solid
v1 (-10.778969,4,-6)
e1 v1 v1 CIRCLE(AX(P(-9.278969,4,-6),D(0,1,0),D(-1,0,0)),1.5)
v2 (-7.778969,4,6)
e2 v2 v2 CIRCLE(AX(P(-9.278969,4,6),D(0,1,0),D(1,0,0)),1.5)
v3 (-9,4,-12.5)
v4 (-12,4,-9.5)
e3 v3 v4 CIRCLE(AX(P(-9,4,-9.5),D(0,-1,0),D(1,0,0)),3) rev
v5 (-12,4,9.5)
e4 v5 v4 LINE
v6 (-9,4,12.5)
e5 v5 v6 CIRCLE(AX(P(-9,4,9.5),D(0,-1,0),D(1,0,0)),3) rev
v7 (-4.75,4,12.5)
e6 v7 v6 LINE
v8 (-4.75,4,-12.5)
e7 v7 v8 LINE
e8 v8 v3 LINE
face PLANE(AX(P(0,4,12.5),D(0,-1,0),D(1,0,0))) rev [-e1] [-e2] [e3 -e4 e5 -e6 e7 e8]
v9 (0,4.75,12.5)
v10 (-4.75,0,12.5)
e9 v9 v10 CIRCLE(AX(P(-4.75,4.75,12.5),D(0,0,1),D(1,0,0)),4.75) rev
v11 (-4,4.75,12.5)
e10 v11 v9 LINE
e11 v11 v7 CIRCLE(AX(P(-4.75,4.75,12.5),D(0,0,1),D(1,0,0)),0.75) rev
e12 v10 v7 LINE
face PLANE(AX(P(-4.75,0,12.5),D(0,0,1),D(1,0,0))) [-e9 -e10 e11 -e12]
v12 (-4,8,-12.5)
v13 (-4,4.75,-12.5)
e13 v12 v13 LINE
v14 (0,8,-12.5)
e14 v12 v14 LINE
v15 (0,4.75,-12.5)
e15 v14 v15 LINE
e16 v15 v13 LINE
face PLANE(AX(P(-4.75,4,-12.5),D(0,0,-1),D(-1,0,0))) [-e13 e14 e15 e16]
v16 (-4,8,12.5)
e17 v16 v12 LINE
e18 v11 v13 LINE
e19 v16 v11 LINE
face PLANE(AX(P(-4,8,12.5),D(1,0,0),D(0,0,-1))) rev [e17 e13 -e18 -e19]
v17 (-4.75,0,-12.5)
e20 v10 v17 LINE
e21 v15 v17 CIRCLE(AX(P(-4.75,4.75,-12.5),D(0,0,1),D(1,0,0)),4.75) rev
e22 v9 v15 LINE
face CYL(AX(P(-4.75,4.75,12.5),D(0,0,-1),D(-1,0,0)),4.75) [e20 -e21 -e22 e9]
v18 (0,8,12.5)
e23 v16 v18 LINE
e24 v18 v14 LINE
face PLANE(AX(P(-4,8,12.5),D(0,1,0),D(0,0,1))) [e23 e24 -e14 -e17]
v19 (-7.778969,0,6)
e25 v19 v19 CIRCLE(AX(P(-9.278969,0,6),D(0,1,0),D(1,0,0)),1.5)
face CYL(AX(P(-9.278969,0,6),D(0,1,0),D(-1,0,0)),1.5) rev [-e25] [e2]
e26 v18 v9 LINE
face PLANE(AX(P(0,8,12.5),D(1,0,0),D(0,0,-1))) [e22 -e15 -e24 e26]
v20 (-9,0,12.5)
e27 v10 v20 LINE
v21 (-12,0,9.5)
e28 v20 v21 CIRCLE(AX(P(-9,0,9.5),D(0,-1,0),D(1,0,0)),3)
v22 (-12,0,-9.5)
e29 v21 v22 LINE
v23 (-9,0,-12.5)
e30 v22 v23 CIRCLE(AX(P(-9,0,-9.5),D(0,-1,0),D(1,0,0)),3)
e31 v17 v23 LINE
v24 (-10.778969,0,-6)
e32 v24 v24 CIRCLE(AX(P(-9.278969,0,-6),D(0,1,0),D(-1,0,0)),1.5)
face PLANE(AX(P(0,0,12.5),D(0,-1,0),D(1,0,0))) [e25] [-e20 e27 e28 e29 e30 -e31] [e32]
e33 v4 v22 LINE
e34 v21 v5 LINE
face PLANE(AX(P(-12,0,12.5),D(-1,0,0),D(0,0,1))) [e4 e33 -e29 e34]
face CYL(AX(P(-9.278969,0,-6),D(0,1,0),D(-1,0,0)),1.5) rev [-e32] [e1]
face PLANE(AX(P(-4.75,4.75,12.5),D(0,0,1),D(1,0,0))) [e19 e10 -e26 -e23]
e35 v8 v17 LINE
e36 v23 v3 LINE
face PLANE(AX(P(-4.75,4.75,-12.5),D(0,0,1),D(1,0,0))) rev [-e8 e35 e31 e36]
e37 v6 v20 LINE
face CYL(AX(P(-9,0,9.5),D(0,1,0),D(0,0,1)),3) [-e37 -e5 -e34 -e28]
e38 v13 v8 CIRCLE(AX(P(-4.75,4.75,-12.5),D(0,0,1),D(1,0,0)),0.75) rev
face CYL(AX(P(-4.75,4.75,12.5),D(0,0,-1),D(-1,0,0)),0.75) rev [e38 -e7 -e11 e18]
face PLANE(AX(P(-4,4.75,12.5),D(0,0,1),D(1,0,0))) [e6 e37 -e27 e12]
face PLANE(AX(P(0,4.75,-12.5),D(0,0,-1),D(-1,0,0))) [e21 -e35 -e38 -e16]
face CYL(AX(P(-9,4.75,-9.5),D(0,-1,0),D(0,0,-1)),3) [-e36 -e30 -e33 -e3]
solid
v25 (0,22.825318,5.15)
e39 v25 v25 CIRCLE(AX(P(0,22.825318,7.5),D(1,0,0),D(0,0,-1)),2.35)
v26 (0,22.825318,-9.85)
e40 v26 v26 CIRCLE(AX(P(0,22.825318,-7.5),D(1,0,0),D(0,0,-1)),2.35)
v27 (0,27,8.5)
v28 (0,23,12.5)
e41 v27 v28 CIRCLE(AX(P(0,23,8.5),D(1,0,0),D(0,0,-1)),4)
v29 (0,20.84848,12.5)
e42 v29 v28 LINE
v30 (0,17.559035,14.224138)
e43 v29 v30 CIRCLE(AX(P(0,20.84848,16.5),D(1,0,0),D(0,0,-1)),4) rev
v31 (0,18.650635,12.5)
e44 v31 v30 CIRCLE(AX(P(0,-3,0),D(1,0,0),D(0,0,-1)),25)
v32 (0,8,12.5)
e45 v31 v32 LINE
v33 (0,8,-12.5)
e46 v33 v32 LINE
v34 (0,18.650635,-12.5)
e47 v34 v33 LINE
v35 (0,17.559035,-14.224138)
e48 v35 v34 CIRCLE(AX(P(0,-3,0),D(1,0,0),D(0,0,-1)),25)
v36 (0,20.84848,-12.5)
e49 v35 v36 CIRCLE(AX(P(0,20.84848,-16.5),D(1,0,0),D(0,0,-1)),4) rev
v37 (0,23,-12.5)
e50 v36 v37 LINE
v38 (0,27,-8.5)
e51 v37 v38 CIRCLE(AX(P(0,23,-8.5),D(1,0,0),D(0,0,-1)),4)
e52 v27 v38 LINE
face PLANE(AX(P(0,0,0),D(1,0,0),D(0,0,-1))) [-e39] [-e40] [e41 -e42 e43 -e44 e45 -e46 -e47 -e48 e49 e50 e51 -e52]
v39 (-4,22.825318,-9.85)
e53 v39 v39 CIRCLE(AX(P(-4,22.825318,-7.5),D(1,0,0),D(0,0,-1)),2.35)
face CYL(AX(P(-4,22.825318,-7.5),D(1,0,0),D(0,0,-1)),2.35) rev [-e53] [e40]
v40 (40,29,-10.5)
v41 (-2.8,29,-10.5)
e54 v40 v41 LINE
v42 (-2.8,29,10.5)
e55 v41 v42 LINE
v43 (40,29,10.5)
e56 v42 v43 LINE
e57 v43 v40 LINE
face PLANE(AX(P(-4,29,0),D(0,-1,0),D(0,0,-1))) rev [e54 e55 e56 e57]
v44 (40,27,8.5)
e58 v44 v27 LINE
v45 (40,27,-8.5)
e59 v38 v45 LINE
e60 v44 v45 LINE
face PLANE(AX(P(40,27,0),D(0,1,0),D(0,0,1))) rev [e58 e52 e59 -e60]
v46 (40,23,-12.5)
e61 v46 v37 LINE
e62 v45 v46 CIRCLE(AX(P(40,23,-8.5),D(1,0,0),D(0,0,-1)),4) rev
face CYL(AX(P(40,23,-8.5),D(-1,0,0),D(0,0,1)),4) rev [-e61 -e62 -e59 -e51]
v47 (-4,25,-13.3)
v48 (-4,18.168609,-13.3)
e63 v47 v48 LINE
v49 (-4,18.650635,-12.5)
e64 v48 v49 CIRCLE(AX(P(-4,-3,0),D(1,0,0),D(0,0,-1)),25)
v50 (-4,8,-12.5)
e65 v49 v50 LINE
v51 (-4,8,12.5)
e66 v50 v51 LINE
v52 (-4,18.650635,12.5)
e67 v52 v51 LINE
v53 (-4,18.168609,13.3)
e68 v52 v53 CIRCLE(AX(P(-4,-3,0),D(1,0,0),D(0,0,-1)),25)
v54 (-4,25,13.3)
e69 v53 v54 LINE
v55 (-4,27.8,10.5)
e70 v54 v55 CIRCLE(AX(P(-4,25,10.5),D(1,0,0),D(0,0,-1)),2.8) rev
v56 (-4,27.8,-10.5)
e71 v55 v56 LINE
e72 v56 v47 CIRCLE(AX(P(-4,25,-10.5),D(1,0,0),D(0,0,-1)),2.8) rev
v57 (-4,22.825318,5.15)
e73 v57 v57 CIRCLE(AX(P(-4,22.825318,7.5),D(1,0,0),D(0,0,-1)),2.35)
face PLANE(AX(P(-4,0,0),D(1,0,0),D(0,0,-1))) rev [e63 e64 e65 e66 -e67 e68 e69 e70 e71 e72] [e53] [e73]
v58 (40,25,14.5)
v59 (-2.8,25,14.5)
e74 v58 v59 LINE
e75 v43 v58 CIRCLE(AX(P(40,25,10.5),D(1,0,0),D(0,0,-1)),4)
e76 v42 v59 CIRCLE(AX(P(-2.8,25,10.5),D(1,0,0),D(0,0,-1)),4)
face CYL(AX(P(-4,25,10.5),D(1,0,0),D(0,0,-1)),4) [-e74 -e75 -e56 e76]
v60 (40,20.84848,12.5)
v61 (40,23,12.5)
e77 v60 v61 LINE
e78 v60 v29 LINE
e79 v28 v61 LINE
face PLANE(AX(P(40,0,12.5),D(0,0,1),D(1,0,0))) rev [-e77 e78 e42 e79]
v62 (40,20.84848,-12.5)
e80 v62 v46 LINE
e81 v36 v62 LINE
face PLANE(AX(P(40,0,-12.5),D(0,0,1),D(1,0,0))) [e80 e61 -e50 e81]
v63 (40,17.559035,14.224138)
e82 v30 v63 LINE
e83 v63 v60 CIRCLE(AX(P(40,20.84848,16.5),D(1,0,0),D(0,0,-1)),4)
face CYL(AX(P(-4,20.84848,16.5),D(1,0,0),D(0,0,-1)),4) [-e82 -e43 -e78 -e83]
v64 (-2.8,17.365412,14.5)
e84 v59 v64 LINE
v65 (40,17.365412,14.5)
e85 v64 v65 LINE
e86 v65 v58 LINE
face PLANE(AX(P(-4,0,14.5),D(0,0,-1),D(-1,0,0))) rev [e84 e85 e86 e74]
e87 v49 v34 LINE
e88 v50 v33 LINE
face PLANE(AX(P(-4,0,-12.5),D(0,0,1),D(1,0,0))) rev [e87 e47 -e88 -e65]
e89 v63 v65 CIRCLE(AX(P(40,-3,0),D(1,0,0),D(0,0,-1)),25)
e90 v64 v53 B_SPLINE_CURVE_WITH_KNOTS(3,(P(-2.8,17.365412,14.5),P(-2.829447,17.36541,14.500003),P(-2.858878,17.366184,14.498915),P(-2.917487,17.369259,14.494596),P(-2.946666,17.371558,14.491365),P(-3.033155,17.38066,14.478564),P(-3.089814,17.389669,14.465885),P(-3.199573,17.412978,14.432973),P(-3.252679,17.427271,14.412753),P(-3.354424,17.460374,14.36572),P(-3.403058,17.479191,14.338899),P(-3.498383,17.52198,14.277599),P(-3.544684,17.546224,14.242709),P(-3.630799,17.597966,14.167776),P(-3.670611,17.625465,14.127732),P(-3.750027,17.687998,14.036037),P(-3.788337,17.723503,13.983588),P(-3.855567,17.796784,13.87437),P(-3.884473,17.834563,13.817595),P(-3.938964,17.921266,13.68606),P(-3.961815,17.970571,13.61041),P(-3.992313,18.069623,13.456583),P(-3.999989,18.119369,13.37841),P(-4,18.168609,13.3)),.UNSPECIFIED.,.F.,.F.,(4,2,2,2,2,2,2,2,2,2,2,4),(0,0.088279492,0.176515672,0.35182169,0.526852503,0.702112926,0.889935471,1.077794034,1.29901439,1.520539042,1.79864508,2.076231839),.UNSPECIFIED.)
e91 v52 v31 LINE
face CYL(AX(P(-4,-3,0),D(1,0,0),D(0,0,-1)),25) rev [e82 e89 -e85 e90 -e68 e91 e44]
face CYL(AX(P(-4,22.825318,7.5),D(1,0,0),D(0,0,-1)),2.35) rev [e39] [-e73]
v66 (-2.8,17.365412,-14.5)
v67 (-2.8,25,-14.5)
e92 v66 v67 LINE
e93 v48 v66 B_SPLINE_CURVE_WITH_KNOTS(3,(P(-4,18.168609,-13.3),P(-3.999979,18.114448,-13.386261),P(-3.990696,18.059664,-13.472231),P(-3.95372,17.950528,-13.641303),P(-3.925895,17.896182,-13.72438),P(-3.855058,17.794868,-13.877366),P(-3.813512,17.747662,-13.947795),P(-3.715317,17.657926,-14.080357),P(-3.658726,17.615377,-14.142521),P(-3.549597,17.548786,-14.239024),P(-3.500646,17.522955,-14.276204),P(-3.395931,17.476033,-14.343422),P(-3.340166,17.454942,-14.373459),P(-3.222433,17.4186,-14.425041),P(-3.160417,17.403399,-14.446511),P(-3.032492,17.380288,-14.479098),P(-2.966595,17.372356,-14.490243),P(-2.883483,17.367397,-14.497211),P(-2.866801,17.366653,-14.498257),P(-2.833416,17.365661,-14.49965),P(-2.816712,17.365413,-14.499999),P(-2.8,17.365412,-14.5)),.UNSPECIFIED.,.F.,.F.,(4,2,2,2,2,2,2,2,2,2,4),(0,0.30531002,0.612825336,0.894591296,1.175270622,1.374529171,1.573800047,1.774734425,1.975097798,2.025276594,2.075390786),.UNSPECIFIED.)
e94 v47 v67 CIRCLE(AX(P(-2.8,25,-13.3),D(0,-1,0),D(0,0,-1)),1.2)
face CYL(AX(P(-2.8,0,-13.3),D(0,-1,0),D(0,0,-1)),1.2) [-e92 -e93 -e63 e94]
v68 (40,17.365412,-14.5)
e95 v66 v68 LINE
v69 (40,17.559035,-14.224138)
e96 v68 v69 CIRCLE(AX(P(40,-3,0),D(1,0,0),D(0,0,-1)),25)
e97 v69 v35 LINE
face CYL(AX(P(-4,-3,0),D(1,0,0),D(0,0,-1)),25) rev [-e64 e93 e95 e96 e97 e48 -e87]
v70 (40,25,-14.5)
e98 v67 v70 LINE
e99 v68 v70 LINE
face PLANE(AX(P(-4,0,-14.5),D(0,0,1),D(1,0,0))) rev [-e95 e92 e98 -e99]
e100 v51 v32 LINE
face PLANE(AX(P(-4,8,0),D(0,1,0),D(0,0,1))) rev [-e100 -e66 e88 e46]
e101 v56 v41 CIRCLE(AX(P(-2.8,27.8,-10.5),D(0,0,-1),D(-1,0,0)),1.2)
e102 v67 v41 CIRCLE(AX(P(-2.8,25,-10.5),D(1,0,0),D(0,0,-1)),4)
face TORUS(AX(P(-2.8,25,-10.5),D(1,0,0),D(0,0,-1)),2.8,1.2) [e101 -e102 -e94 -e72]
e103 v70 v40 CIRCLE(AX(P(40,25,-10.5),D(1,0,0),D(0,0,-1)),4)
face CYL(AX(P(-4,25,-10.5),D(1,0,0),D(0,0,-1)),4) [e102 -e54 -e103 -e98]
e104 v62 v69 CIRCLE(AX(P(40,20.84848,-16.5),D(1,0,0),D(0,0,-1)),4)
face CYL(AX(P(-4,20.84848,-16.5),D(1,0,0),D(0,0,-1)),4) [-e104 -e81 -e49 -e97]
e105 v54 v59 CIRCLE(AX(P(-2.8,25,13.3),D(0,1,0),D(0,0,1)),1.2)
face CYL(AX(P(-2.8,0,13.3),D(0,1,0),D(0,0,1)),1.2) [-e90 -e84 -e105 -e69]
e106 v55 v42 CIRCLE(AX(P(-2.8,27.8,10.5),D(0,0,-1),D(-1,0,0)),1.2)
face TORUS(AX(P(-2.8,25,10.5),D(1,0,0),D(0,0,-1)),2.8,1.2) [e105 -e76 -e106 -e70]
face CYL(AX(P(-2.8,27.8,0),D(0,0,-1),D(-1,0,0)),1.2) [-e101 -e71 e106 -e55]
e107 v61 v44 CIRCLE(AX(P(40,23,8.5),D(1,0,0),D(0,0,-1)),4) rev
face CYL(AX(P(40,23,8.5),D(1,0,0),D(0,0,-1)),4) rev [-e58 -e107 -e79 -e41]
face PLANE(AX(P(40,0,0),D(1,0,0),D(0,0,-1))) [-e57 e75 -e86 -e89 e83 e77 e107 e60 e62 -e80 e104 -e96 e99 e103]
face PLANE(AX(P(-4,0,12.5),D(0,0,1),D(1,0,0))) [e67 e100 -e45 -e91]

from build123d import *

# Parameters (mm, degrees)
BASE_FLANGE1_DEPTH  = 12.5
FILLET1_R           = 3
SKETCH6_R           = 1.5
CUT_EXTRUDE1_DEPTH  = 18.783419244
BOSS_EXTRUDE1_DEPTH = 4
BOSS_EXTRUDE3_DEPTH = 40
FILLET2_R           = 4
FILLET3_R           = 1.2


# Sheet-metal steps are written as plain solids
with BuildPart() as part:
    # Sketch1 → Base-Flange1 (new, symmetric)
    with BuildSketch(Plane.XY):
        with BuildLine():
            Line((0, 8), (0, 4.75))
            ThreePointArc((0, 4.75), (-1.391242789, 1.391242789), (-4.75, 0))
            Line((-4.75, 0), (-12, 0))
            Line((-12, 0), (-12, 4))
            Line((-12, 4), (-4.75, 4))
            ThreePointArc((-4.75, 4), (-4.219669914, 4.219669914), (-4, 4.75))
            Line((-4, 4.75), (-4, 8))
            Line((-4, 8), (0, 8))
        make_face()
    extrude(amount=BASE_FLANGE1_DEPTH, both=True)

    # Fillet1
    fillet1_edges = [part.edges().sort_by_distance(p)[0] for p in [
        (-12, 2, 12.5),
        (-12, 2, -12.5),
    ]]
    fillet(fillet1_edges, radius=FILLET1_R)

    # Sketch6 → Cut-Extrude1 (cut, through all)
    with BuildSketch(Plane(origin=(0, 4, 0), x_dir=(1, 0, 0), z_dir=(0, 1, 0))):
        with Locations(Location((-9.278968908, 6, 0), (0, 0, 180))):
            Circle(SKETCH6_R)
        with Locations((-9.278968908, -6)):
            Circle(SKETCH6_R)
    extrude(amount=-CUT_EXTRUDE1_DEPTH, mode=Mode.SUBTRACT)


with BuildPart() as body_2:
    # Sketch8 → Boss-Extrude1 (new body)
    with BuildSketch(Plane(origin=(0, 0, 0), x_dir=(0, 0, -1), z_dir=(1, 0, 0))):
        Polygon((-12.5, 18.650635095), (-12.5, 17.365411854), (-12.5, 8), (12.5, 8), (12.5, 17.365411854), (12.5, 18.650635095), align=None)
        with BuildLine():
            ThreePointArc((-8.251909394, 20.598855721), (-10.42157986, 19.724230971), (-12.5, 18.650635095))
            Line((-12.5, 18.650635095), (12.5, 18.650635095))
            ThreePointArc((12.5, 18.650635095), (10.42157986, 19.724230971), (8.251909394, 20.598855721))
            ThreePointArc((8.251909394, 20.598855721), (6.844608492, 20.568558373), (5.672455033, 21.347962007))
            ThreePointArc((5.672455033, 21.347962007), (0, 22), (-5.672455033, 21.347962007))
            ThreePointArc((-5.672455033, 21.347962007), (-6.844608492, 20.568558373), (-8.251909394, 20.598855721))
        make_face()
        with BuildLine():
            Line((-12.5, 27), (-12.5, 22.825317547))
            Line((-12.5, 22.825317547), (-9.85, 22.825317547))
            ThreePointArc((-9.85, 22.825317547), (-7.5, 25.175317547), (-5.15, 22.825317547))
            Line((-5.15, 22.825317547), (5.15, 22.825317547))
            ThreePointArc((5.15, 22.825317547), (7.5, 25.175317547), (9.85, 22.825317547))
            Line((9.85, 22.825317547), (12.5, 22.825317547))
            Line((12.5, 22.825317547), (12.5, 27))
            Line((12.5, 27), (-12.5, 27))
        make_face()
        with BuildLine():
            ThreePointArc((8.251909394, 20.598855721), (10.42157986, 19.724230971), (12.5, 18.650635095))
            Line((12.5, 18.650635095), (12.5, 22.825317547))
            Line((12.5, 22.825317547), (9.85, 22.825317547))
            ThreePointArc((9.85, 22.825317547), (9.409121143, 21.455005006), (8.251909394, 20.598855721))
        make_face()
        with BuildLine():
            ThreePointArc((-5.15, 22.825317547), (-5.284460486, 22.041809626), (-5.672455033, 21.347962007))
            ThreePointArc((-5.672455033, 21.347962007), (0, 22), (5.672455033, 21.347962007))
            ThreePointArc((5.672455033, 21.347962007), (5.284460486, 22.041809626), (5.15, 22.825317547))
            Line((5.15, 22.825317547), (-5.15, 22.825317547))
        make_face()
        with BuildLine():
            Line((-12.5, 22.825317547), (-12.5, 18.650635095))
            ThreePointArc((-12.5, 18.650635095), (-10.42157986, 19.724230971), (-8.251909394, 20.598855721))
            ThreePointArc((-8.251909394, 20.598855721), (-9.409121143, 21.455005006), (-9.85, 22.825317547))
            Line((-9.85, 22.825317547), (-12.5, 22.825317547))
        make_face()
        Polygon((-14.5, 29), (-14.5, 22.825317547), (-12.5, 22.825317547), (-12.5, 27), (12.5, 27), (12.5, 22.825317547), (14.5, 22.825317547), (14.5, 29), align=None)
        with BuildLine():
            Line((12.5, 22.825317547), (12.5, 18.650635095))
            ThreePointArc((12.5, 18.650635095), (13.515285779, 18.031810438), (14.5, 17.365411854))
            Line((14.5, 17.365411854), (14.5, 18.650635095))
            Line((14.5, 18.650635095), (14.5, 22.825317547))
            Line((14.5, 22.825317547), (12.5, 22.825317547))
        make_face()
        with BuildLine():
            Line((-14.5, 22.825317547), (-14.5, 18.650635095))
            Line((-14.5, 18.650635095), (-14.5, 17.365411854))
            ThreePointArc((-14.5, 17.365411854), (-13.515285779, 18.031810438), (-12.5, 18.650635095))
            Line((-12.5, 18.650635095), (-12.5, 22.825317547))
            Line((-12.5, 22.825317547), (-14.5, 22.825317547))
        make_face()
    extrude(amount=-BOSS_EXTRUDE1_DEPTH)

    # Sketch8<4> → Boss-Extrude3 (add)
    with BuildSketch(Plane(origin=(0, 0, 0), x_dir=(0, 0, -1), z_dir=(1, 0, 0))):
        Polygon((-14.5, 29), (-14.5, 22.825317547), (-12.5, 22.825317547), (-12.5, 27), (12.5, 27), (12.5, 22.825317547), (14.5, 22.825317547), (14.5, 29), align=None)
        with BuildLine():
            Line((-14.5, 22.825317547), (-14.5, 18.650635095))
            Line((-14.5, 18.650635095), (-14.5, 17.365411854))
            ThreePointArc((-14.5, 17.365411854), (-13.515285779, 18.031810438), (-12.5, 18.650635095))
            Line((-12.5, 18.650635095), (-12.5, 22.825317547))
            Line((-12.5, 22.825317547), (-14.5, 22.825317547))
        make_face()
        with BuildLine():
            Line((12.5, 22.825317547), (12.5, 18.650635095))
            ThreePointArc((12.5, 18.650635095), (13.515285779, 18.031810438), (14.5, 17.365411854))
            Line((14.5, 17.365411854), (14.5, 18.650635095))
            Line((14.5, 18.650635095), (14.5, 22.825317547))
            Line((14.5, 22.825317547), (12.5, 22.825317547))
        make_face()
    extrude(amount=BOSS_EXTRUDE3_DEPTH)

    # Fillet2
    fillet2_edges = [body_2.edges().sort_by_distance(p)[0] for p in [
        (18, 29, 14.5),
        (18, 29, -14.5),
        (20, 18.650635095, 12.5),
        (20, 27, 12.5),
        (20, 27, -12.5),
        (20, 18.650635095, -12.5),
    ]]
    fillet(fillet2_edges, radius=FILLET2_R)

    # Fillet3
    fillet3_edges = [body_2.edges().sort_by_distance(p)[0] for p in [
        (-4, 21.182705927, 14.5),
        (-4, 29, 0),
        (-4, 21.182705927, -14.5),
        (-4, 27.828427125, -13.328427125),
        (-4, 27.828427125, 13.328427125),
    ]]
    fillet(fillet3_edges, radius=FILLET3_R)


solid = Compound([part.part, body_2.part])
